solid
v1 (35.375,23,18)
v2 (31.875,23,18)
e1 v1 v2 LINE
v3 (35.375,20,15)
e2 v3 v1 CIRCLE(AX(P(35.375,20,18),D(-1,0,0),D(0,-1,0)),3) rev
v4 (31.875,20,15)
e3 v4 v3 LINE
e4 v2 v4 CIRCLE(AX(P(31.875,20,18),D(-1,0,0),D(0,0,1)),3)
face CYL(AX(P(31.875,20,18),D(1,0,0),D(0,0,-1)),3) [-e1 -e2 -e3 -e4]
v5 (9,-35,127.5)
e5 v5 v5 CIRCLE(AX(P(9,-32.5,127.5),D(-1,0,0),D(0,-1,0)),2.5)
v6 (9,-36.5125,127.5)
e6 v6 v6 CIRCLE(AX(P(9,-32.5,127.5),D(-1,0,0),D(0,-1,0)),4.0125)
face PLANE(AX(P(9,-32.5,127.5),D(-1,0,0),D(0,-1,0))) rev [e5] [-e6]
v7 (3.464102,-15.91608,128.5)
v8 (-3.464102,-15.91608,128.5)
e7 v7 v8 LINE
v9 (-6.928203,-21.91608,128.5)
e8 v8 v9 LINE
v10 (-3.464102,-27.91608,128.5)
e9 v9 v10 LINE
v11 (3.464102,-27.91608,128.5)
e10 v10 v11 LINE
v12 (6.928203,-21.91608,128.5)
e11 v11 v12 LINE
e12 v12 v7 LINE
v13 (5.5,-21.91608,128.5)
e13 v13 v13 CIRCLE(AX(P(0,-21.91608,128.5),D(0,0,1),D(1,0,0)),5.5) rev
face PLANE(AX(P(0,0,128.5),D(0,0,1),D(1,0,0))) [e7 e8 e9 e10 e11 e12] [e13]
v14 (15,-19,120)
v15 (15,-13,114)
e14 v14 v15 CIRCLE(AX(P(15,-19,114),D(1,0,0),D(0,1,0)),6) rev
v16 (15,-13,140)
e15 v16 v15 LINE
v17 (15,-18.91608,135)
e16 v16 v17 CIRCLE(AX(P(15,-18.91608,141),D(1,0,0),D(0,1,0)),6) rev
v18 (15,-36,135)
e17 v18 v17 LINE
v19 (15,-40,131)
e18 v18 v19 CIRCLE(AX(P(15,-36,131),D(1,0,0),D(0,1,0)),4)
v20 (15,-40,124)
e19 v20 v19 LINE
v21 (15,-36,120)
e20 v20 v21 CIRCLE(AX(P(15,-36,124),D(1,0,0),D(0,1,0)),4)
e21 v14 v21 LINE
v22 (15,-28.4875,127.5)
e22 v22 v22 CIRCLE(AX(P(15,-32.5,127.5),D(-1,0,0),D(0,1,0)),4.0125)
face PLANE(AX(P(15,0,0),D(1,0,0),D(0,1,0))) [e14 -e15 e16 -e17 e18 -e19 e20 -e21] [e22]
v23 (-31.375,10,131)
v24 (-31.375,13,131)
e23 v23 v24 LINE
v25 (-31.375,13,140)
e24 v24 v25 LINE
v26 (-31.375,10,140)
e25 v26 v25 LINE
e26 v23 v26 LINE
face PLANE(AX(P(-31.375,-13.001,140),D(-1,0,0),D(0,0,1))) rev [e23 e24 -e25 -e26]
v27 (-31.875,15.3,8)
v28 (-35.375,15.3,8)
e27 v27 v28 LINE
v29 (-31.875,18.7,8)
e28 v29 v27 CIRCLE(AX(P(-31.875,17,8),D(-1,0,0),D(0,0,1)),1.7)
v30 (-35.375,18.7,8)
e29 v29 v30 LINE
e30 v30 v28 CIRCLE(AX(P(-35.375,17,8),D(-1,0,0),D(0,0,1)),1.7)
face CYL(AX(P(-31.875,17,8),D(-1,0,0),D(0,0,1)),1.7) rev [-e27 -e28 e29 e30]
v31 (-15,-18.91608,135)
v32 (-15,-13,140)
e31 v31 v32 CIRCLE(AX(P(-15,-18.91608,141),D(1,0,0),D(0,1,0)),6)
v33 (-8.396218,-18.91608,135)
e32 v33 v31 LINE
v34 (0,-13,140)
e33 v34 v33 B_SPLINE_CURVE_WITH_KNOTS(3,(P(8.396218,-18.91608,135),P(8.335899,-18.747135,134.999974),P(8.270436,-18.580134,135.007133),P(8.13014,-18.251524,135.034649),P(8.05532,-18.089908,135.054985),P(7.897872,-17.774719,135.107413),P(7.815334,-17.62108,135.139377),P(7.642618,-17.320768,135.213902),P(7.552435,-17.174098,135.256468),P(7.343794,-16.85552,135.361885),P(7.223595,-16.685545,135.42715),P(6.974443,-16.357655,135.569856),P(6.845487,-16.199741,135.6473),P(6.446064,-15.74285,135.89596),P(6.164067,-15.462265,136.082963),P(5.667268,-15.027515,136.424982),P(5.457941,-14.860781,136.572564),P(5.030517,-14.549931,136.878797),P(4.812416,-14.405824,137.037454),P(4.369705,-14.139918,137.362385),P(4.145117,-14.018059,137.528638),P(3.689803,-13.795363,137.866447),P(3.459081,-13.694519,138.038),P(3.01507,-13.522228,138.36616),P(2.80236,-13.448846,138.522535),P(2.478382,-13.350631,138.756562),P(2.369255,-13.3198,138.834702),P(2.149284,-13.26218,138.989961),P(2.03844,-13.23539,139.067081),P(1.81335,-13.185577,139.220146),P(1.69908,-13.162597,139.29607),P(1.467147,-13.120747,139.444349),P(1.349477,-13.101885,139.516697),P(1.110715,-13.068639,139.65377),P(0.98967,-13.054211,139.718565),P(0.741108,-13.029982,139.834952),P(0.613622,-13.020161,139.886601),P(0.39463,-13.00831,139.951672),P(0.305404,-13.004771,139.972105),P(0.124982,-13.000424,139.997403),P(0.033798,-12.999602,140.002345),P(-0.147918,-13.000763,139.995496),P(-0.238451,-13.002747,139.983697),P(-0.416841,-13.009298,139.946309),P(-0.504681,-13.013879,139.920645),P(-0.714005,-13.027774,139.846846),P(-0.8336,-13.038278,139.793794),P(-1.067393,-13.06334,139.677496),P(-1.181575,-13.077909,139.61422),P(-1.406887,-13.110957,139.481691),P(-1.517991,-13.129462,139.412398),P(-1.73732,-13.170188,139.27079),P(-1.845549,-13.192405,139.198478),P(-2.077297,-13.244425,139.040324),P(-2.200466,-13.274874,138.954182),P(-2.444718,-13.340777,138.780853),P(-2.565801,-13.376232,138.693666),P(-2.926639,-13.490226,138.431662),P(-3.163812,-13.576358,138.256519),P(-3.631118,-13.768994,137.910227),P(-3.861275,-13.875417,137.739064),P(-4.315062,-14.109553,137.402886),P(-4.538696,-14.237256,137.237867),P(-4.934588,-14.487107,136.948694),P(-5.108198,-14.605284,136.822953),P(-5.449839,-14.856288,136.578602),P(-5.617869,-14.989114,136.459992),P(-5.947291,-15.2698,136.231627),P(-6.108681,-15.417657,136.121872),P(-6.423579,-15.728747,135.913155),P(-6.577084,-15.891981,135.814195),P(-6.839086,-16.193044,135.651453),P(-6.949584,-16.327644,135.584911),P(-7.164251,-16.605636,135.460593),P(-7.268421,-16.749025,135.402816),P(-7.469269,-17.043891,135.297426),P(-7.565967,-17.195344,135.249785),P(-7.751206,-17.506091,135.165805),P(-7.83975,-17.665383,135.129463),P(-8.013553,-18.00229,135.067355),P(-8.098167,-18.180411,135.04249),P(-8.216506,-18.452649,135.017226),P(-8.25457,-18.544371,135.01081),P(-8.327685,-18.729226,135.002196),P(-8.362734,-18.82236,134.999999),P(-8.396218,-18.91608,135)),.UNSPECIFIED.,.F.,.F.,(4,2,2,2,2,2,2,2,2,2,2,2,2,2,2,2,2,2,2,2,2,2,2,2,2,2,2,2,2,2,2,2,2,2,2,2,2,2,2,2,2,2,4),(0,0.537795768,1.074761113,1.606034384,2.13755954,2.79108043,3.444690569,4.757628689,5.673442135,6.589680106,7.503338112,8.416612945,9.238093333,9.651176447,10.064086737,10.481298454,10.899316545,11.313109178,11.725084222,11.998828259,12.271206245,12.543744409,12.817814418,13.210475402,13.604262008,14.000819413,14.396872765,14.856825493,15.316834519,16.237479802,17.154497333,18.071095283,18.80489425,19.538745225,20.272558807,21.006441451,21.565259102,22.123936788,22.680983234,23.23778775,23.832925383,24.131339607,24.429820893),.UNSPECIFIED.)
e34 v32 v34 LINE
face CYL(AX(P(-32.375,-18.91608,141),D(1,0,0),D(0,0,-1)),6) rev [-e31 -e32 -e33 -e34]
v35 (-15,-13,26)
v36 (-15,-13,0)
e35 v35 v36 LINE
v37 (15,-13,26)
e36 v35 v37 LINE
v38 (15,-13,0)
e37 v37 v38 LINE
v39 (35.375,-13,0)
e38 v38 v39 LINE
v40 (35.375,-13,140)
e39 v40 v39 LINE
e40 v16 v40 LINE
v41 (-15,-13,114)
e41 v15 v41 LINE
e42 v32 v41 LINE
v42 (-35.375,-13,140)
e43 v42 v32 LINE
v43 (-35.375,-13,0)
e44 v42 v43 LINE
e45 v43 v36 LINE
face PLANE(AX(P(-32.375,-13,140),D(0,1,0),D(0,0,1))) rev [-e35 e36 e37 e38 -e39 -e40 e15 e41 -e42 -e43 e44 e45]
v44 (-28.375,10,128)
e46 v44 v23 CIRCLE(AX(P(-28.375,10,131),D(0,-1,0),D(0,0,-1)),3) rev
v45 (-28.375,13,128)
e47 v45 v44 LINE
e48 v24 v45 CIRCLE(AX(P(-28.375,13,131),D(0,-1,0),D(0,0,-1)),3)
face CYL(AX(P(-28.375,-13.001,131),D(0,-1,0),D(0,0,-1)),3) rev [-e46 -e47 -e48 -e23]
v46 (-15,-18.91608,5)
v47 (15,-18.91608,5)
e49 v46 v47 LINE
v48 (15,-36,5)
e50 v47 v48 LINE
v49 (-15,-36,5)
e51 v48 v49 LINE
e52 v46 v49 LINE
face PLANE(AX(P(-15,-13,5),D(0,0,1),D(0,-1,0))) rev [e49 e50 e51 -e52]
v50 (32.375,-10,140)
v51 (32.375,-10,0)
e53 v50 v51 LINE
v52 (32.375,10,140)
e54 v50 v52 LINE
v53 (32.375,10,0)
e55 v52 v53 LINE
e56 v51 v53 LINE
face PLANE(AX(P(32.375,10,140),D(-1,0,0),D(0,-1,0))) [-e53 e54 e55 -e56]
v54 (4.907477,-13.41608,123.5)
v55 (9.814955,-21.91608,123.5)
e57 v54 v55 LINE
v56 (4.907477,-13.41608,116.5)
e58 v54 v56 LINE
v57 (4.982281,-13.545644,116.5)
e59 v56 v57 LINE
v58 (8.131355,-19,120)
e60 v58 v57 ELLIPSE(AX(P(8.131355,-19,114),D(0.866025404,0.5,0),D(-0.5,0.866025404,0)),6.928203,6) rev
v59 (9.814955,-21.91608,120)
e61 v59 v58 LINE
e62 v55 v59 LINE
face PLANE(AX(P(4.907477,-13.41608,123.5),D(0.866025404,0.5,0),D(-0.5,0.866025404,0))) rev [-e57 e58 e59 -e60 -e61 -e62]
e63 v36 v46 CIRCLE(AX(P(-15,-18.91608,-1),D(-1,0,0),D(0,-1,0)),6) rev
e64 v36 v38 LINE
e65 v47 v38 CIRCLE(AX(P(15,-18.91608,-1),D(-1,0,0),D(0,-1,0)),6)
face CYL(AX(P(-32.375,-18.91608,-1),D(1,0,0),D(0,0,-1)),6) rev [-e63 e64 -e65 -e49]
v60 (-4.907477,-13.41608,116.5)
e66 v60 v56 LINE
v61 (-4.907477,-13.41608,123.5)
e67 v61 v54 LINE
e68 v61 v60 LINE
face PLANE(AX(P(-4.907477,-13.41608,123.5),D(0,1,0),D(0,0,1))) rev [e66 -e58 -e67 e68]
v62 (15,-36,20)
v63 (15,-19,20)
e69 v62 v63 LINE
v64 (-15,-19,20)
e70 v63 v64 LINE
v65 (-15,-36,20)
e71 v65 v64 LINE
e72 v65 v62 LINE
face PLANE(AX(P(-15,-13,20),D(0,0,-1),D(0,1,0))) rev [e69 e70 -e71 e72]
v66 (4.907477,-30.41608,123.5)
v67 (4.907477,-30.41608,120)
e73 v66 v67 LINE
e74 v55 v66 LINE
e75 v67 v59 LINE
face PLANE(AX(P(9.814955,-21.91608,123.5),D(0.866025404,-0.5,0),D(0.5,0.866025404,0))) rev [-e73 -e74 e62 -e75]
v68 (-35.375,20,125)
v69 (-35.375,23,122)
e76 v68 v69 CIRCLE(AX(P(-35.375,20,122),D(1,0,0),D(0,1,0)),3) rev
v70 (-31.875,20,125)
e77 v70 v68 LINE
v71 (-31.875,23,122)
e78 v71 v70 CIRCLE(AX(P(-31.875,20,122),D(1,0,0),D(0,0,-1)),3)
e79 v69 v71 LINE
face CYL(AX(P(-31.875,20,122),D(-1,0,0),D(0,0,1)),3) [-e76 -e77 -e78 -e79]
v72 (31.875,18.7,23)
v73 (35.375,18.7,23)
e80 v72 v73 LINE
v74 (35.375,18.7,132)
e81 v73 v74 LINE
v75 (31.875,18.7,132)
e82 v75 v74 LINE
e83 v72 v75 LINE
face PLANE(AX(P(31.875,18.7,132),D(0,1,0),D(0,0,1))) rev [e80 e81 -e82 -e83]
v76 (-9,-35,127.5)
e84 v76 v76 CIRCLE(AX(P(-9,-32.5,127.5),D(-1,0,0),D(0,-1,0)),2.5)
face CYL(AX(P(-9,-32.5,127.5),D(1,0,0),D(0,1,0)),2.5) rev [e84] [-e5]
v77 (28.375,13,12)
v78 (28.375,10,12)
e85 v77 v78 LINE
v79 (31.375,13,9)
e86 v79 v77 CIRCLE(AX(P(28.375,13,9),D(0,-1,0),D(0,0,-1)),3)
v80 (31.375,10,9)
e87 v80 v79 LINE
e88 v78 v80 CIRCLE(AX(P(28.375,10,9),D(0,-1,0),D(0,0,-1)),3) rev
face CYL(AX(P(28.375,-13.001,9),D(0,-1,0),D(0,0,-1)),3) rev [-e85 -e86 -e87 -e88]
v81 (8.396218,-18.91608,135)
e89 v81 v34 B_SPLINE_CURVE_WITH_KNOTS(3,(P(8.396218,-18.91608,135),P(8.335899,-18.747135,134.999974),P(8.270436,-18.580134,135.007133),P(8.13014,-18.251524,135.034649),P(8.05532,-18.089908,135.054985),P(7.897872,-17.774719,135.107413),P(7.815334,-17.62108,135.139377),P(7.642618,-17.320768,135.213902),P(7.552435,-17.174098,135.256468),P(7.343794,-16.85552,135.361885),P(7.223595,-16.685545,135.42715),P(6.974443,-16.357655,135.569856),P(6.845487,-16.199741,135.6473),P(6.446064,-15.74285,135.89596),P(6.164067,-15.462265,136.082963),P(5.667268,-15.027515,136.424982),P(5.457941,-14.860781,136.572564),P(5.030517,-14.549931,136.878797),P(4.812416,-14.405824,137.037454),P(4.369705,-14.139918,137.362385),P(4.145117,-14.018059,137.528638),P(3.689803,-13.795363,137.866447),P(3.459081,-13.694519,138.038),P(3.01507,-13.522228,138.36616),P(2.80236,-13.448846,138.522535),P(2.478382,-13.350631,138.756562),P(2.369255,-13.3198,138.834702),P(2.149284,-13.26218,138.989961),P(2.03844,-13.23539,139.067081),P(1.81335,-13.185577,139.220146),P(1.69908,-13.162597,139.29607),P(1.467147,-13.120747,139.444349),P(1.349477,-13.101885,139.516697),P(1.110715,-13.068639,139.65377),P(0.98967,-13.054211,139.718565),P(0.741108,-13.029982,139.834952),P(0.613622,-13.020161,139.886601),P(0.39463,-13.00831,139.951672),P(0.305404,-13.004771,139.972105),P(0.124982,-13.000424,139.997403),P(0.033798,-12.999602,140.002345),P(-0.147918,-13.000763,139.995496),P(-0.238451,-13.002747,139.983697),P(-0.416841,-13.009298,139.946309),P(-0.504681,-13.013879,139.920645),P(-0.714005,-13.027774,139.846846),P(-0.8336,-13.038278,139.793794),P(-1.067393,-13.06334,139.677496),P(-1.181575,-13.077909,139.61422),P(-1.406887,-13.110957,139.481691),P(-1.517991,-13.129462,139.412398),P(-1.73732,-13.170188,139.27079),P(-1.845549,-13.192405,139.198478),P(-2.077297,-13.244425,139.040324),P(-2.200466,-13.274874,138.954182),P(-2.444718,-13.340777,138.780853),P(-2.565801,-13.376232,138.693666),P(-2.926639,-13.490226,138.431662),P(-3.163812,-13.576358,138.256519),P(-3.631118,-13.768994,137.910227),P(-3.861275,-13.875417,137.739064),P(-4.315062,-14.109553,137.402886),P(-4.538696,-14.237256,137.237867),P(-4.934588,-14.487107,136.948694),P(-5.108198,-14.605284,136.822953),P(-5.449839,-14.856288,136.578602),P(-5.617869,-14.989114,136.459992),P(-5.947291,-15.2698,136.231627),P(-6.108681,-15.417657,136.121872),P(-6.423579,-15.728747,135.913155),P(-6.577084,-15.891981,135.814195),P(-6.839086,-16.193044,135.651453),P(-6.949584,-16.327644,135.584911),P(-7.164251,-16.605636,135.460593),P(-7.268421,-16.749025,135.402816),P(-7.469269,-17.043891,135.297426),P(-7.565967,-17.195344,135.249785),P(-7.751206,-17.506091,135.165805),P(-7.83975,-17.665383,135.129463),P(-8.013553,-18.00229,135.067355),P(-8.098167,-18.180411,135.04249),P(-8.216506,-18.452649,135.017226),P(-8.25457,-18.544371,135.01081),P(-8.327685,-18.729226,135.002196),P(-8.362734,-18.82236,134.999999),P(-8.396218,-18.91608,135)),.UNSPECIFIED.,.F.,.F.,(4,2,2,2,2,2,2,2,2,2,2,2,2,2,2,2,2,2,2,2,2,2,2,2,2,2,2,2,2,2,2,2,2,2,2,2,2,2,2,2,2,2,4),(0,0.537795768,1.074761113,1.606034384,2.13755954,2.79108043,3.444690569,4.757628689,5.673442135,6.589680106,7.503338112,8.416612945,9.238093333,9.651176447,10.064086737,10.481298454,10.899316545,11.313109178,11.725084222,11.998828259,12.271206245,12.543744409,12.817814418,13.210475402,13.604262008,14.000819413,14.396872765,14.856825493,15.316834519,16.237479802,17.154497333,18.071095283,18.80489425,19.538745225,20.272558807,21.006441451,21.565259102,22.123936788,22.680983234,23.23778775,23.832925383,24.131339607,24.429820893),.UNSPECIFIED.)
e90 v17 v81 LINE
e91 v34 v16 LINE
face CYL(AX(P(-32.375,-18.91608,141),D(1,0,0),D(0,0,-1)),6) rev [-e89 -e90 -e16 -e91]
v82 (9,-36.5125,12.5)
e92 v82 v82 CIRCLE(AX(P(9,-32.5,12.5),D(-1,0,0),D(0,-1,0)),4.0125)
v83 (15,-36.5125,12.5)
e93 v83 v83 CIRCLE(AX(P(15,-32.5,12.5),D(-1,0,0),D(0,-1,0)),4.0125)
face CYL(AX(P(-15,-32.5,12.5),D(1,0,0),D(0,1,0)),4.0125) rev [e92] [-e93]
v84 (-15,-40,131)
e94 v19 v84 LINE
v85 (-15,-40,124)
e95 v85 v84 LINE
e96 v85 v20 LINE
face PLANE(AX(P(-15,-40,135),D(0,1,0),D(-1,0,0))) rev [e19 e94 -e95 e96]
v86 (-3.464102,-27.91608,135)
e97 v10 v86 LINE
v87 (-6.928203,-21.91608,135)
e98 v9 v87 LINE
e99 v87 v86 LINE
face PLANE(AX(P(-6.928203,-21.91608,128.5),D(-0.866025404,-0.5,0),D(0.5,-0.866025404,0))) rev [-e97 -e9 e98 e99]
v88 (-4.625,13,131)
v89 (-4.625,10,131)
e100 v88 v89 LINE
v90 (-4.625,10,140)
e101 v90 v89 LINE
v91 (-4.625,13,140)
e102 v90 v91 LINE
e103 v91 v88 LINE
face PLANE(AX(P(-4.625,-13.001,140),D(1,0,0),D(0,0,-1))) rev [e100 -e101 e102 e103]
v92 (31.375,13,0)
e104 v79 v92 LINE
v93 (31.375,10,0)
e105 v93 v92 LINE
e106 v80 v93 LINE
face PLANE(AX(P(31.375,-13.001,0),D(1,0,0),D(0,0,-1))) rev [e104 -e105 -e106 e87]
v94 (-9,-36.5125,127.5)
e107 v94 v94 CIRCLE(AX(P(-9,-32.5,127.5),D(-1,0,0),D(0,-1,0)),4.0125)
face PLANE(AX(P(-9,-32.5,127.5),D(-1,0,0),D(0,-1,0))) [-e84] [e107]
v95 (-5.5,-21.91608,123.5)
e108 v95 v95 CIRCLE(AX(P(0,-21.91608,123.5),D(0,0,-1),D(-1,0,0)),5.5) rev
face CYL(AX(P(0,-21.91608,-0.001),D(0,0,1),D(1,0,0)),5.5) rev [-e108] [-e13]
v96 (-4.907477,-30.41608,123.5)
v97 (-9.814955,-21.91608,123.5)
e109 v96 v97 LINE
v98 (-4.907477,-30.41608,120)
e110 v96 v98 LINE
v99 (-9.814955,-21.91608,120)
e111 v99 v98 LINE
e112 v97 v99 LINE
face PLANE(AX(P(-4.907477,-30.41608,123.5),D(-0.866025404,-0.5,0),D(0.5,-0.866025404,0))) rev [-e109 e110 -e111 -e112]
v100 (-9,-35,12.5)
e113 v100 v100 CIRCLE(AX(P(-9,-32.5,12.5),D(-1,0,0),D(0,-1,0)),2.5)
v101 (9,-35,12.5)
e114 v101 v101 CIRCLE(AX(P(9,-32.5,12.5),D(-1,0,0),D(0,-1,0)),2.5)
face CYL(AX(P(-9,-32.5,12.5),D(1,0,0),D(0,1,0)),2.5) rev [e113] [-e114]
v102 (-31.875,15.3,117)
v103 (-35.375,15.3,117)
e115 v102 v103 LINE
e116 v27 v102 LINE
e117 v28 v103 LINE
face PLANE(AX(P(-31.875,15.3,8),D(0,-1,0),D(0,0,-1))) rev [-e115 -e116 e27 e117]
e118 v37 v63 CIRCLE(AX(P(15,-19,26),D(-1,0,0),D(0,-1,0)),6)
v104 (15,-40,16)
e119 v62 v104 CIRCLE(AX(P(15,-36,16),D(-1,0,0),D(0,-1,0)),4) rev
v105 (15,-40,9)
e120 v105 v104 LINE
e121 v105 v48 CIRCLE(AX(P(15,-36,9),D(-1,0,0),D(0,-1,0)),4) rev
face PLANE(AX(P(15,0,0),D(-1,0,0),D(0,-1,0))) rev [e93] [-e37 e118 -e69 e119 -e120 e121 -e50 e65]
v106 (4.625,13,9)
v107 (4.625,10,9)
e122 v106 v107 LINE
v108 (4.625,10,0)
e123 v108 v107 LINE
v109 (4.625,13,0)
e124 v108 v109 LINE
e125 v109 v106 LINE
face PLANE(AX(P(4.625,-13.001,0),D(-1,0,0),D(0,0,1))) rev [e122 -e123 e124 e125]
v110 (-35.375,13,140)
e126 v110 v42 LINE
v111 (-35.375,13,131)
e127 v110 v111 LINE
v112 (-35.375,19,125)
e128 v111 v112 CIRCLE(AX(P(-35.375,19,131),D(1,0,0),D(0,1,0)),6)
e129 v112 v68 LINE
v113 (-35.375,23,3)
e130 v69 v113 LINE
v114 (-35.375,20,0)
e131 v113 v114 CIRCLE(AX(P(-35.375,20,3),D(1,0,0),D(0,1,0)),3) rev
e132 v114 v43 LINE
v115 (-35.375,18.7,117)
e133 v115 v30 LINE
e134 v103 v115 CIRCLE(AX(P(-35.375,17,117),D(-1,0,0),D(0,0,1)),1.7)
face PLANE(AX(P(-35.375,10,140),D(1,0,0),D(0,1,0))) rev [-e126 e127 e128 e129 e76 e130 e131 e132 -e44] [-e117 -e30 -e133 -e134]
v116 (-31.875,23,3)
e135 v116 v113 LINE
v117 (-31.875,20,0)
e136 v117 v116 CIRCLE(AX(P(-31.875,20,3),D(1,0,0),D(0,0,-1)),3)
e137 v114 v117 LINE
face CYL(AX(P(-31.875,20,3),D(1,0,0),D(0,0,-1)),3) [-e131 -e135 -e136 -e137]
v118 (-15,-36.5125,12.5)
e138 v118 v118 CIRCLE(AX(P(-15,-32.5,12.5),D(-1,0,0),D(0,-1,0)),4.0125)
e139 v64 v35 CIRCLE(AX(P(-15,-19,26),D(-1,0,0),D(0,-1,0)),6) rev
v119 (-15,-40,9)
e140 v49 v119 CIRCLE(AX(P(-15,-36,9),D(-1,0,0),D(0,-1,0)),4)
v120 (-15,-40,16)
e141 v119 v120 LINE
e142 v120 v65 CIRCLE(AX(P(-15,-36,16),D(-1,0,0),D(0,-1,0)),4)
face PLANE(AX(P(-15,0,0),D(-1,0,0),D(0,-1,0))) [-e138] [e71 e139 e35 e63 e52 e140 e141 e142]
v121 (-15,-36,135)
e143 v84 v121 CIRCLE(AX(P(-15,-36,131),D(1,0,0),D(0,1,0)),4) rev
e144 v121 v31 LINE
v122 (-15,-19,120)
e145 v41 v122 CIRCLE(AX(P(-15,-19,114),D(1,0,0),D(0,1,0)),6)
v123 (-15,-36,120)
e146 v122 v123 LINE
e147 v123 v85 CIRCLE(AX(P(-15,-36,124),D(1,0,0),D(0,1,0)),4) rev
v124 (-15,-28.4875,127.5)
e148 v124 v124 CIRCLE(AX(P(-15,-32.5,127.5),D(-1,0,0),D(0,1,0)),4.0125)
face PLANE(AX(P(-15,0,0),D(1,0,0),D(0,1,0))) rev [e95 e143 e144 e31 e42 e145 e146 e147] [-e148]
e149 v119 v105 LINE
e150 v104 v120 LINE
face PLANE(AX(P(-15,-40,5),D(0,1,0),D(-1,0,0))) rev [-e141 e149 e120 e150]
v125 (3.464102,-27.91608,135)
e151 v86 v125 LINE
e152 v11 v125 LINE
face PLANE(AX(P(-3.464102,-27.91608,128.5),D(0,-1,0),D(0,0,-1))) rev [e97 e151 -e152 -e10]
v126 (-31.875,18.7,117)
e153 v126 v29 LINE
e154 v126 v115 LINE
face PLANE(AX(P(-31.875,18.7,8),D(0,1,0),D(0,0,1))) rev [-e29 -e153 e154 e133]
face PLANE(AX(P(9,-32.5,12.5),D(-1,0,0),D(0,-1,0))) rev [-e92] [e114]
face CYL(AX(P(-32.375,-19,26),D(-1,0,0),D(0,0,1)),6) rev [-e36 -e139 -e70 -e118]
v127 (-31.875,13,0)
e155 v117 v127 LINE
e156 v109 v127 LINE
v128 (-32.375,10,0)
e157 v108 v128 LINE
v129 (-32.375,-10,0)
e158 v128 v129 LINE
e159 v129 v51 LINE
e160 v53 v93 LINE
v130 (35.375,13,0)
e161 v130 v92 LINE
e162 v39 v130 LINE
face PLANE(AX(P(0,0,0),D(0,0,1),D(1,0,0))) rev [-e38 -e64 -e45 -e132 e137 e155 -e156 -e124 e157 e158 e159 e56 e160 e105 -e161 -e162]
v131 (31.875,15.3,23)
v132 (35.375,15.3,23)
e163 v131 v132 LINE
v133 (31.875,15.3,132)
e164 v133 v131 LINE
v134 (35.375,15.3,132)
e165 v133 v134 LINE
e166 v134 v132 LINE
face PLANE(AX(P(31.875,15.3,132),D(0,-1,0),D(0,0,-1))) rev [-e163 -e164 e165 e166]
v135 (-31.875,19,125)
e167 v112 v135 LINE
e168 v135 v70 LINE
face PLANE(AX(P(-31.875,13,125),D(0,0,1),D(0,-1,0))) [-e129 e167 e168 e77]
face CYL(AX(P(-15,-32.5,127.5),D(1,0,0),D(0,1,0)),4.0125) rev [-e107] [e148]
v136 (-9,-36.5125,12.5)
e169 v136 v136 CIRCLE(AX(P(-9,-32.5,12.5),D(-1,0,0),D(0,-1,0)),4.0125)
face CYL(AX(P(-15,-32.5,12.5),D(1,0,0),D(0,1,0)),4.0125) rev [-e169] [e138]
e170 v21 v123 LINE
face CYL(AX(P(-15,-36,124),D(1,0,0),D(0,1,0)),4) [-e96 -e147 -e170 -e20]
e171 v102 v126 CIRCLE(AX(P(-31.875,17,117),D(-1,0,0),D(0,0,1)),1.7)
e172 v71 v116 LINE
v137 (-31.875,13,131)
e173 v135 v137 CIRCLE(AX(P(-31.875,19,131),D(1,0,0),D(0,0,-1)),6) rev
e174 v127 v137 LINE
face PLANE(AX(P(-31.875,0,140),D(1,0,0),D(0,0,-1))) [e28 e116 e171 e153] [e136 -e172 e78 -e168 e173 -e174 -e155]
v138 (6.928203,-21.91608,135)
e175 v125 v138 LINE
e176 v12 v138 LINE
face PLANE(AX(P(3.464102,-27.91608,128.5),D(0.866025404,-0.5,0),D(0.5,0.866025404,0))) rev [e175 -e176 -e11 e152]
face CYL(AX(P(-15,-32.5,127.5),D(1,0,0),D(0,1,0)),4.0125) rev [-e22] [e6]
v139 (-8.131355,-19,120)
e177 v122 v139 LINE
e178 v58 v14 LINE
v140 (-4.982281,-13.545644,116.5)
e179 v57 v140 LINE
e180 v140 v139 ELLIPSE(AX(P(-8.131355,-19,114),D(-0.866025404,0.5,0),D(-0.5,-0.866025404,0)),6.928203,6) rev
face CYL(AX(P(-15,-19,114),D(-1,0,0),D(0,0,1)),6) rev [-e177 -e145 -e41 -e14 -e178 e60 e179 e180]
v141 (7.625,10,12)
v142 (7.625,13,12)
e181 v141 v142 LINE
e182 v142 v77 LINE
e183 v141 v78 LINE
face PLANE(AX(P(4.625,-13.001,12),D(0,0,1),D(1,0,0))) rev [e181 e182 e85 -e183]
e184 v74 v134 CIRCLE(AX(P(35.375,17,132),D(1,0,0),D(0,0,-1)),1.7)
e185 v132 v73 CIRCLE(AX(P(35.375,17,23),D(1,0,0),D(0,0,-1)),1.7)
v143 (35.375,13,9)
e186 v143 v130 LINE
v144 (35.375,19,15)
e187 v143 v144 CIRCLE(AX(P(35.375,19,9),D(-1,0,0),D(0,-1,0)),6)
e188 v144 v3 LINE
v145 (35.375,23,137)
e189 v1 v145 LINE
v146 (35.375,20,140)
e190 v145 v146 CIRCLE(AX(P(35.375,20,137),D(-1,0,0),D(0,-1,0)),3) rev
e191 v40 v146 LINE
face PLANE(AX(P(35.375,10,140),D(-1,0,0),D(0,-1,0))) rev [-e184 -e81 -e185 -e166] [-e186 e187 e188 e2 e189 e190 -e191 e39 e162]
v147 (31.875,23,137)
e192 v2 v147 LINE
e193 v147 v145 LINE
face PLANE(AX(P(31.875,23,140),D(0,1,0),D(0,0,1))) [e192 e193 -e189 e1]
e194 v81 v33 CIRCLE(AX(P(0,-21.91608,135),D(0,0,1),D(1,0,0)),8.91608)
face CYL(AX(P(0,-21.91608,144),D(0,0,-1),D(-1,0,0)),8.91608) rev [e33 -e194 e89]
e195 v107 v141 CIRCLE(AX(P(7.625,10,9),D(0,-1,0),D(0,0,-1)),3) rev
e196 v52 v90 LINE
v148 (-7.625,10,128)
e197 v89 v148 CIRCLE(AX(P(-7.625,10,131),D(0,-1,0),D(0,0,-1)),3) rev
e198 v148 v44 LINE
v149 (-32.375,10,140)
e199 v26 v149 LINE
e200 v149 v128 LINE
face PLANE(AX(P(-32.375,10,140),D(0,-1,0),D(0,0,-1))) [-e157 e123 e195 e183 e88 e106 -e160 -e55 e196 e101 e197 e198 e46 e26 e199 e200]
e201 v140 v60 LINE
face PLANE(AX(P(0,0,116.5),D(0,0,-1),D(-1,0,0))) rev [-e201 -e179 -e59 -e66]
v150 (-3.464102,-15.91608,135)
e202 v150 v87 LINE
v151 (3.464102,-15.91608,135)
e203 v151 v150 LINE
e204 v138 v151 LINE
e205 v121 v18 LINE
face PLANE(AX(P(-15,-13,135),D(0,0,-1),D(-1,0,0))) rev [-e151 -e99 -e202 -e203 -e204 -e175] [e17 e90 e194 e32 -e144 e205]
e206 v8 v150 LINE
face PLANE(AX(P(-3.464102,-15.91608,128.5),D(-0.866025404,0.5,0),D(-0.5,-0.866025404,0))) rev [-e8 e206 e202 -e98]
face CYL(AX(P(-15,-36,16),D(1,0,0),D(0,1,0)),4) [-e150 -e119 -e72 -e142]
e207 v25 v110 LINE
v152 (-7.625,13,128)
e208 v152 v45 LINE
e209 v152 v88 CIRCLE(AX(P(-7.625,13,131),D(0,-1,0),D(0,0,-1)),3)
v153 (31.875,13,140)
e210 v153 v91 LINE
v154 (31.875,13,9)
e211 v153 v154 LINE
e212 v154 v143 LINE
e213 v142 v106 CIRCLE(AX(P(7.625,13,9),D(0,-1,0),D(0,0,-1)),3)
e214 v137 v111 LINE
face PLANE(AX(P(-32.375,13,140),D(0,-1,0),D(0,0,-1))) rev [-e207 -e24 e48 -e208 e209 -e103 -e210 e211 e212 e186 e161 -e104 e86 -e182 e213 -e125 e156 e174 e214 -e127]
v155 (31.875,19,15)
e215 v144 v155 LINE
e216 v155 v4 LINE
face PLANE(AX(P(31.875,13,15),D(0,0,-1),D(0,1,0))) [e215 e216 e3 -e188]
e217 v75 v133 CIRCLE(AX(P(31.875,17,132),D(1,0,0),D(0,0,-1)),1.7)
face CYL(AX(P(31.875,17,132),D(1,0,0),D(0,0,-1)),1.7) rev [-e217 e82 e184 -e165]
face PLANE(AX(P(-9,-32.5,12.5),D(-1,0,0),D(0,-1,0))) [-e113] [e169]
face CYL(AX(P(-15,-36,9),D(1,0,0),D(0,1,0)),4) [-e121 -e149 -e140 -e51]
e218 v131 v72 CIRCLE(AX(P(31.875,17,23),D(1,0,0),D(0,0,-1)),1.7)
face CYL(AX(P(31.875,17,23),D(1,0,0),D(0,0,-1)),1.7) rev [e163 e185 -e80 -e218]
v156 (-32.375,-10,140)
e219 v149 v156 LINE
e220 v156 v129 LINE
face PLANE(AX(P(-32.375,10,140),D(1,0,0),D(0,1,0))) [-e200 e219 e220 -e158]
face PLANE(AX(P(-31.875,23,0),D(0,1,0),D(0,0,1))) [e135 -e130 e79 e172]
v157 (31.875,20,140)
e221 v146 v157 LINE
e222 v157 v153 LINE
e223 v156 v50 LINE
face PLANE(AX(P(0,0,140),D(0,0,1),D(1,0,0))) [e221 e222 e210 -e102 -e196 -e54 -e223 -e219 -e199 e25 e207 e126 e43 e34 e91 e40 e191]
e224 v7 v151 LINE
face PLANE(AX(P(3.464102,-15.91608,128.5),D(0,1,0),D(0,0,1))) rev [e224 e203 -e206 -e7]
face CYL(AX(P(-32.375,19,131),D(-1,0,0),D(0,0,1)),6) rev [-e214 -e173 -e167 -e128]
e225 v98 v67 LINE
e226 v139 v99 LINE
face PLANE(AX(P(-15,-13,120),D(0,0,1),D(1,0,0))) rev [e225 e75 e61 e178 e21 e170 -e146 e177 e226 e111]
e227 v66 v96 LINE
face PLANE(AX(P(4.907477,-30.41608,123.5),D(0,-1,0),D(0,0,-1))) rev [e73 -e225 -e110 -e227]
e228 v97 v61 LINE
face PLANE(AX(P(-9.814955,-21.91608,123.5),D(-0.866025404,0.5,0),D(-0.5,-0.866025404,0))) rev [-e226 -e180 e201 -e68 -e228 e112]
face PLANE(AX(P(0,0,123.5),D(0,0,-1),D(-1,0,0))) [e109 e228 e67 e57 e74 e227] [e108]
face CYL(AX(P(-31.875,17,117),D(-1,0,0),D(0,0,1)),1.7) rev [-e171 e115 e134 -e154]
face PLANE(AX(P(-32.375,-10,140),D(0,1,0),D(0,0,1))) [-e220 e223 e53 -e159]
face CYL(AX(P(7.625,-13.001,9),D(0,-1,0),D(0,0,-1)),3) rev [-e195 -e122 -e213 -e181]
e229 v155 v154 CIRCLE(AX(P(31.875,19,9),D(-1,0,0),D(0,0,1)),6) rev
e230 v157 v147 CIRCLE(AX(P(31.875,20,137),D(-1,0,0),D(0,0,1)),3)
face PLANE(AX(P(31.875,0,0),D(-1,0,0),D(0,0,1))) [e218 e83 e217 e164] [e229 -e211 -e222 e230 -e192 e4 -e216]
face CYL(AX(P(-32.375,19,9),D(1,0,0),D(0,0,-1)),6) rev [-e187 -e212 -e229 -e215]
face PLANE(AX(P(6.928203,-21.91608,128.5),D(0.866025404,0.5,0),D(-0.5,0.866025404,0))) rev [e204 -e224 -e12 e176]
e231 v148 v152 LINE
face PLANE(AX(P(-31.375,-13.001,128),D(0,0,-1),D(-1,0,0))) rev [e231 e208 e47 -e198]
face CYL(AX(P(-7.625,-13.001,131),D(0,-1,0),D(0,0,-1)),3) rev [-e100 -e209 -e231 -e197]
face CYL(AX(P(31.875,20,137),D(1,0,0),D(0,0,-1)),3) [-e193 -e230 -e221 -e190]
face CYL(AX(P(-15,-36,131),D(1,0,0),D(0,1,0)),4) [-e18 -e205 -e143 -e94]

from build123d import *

# Parameters (mm, degrees)
SKETCH1_W            = 64.75
SKETCH1_H            = 20
BODY_DEPTH           = 140
SHELL1_T             = 3
SWITCH_CUTOUT_REACH  = 148.722
SKETCH2_W            = 26.75
SKETCH2_H            = 12
SKETCH4_W            = 15
SKETCH4_H            = 27
SKETCH4_R            = 4.0125
AXLE_HOLDER_DEPTH    = 15
SKETCH5_R            = 4.0125
SKETCH5_R_2          = 2.5
BUSHING_HOLDER_DEPTH = 9
FILLET3_R            = 4
FILLET4_R            = 6
SKETCH6_W            = 125
SKETCH6_H            = 10
SLIDE_MOUNT_DEPTH    = 3.5
CIRPATTERN1_COUNT    = 2
FILLET6_R            = 3
FILLET7_R            = 3
FILLET8_R            = 6
CUT_EXTRUDE1_REACH   = 147.177
SKETCH7_R            = 5.5
SKETCH8_R            = 8.916079783
CUT_EXTRUDE2_DEPTH   = 9
CUT_EXTRUDE3_DEPTH   = 3.5
CUT_EXTRUDE4_DEPTH   = 6.5


with BuildPart() as part:
    # Sketch1 → Body (new body)
    with BuildSketch(Plane.XY):
        Rectangle(SKETCH1_W, SKETCH1_H)
    extrude(amount=BODY_DEPTH)

    # Shell1
    shell1_openings = [part.faces().sort_by_distance(p)[0] for p in [
        (0, 0, 0),
        (0, 0, 140),
    ]]
    offset(amount=SHELL1_T, openings=shell1_openings, kind=Kind.INTERSECTION)

    # Sketch2 → Switch_cutout (cut, up to next)
    with BuildSketch(Plane(origin=(0, 13, 0), x_dir=(1, 0, 0), z_dir=(0, 1, 0)), mode=Mode.PRIVATE) as switch_cutout_sk1:
        with Locations((18, -6)):
            Rectangle(SKETCH2_W, SKETCH2_H)
    switch_cutout_tool1 = extrude(switch_cutout_sk1.sketch, amount=-SWITCH_CUTOUT_REACH, mode=Mode.PRIVATE) & part.part
    # Sketch2 → Switch_cutout (cut, up to next)
    with BuildSketch(Plane(origin=(0, 13, 0), x_dir=(1, 0, 0), z_dir=(0, 1, 0)), mode=Mode.PRIVATE) as switch_cutout_sk2:
        with Locations((-18, -134)):
            Rectangle(SKETCH2_W, SKETCH2_H)
    switch_cutout_tool2 = extrude(switch_cutout_sk2.sketch, amount=-SWITCH_CUTOUT_REACH, mode=Mode.PRIVATE) & part.part
    add(switch_cutout_tool1.solids().sort_by_distance((18, 13, 6))[0], mode=Mode.SUBTRACT)
    add(switch_cutout_tool2.solids().sort_by_distance((-18, 13, 134))[0], mode=Mode.SUBTRACT)

    # Sketch4 → Axle_holder (add, symmetric)
    # profile 1 of 2: a face of its own
    with BuildSketch(Plane.ZY):
        with Locations((12.5, -26.5)):
            Rectangle(SKETCH4_W, SKETCH4_H)
        with Locations(Location((12.5, -32.5, 0), (0, 0, 270))):
            Circle(SKETCH4_R, mode=Mode.SUBTRACT)
    # profile 2 of 2: a face of its own
    with BuildSketch(Plane.ZY):
        with Locations((127.5, -26.5)):
            Rectangle(SKETCH4_W, SKETCH4_H)
        with Locations(Location((127.5, -32.5, 0), (0, 0, 90))):
            Circle(SKETCH4_R, mode=Mode.SUBTRACT)
    extrude(amount=AXLE_HOLDER_DEPTH, both=True)

    # Sketch5 → Bushing_holder (add, symmetric)
    # profile 1 of 2: a face of its own
    with BuildSketch(Plane.ZY):
        with Locations(Location((12.5, -32.5, 0), (0, 0, 270))):
            Circle(SKETCH5_R)
        with Locations(Location((12.5, -32.5, 0), (0, 0, 270))):
            Circle(SKETCH5_R_2, mode=Mode.SUBTRACT)
    # profile 2 of 2: a face of its own
    with BuildSketch(Plane.ZY):
        with Locations(Location((127.5, -32.5, 0), (0, 0, 90))):
            Circle(SKETCH5_R)
        with Locations(Location((127.5, -32.5, 0), (0, 0, 270))):
            Circle(SKETCH5_R_2, mode=Mode.SUBTRACT)
    extrude(amount=BUSHING_HOLDER_DEPTH, both=True)

    # Fillet3
    fillet3_edges = [part.edges().sort_by_distance(p)[0] for p in [
        (0, -40, 5),
        (0, -40, 20),
        (0, -40, 135),
        (0, -40, 120),
    ]]
    fillet(fillet3_edges, radius=FILLET3_R)

    # Fillet4
    # the kernel refuses this fillet: 6 mm, written as the material it adds along each edge
    with BuildSketch(Plane(origin=(15, -13, 5), x_dir=(0, 0, -1), z_dir=(-1, 0, 0))) as fillet4_piece_1:
        with BuildLine():
            CenterArc((6, 5.916079783), FILLET4_R, 180, 80.405931773)
            Line((0, 5.916079783), (-0.12, 5.916079783))
            Line((-0.12, 5.916079783), (-0.12, 0))
            Line((-0.12, 0), (0, -0.12))
            ThreePointArc((0, -0.12), (2.5, -0.12), (4.98, -0.118321596))
            Line((4.98, -0.118321596), (5, 0))
        make_face()
    extrude(amount=30)
    with BuildSketch(Plane(origin=(-15, -13, 20), x_dir=(0, 0, 1), z_dir=(1, 0, 0)), Plane(origin=(-15, -13, 120), x_dir=(0, -1, 0), z_dir=(1, 0, 0))) as fillet4_piece_2:
        with BuildLine():
            CenterArc((FILLET4_R, FILLET4_R), FILLET4_R, 180, 90)
            Line((0, FILLET4_R), (-FILLET4_R * 0.02, FILLET4_R))
            Line((-FILLET4_R * 0.02, FILLET4_R), (-FILLET4_R * 0.02, -FILLET4_R * 0.02))
            Line((-FILLET4_R * 0.02, -FILLET4_R * 0.02), (FILLET4_R, -FILLET4_R * 0.02))
            Line((FILLET4_R, -FILLET4_R * 0.02), (FILLET4_R, 0))
        make_face()
    extrude(amount=30)
    with BuildSketch(Plane(origin=(15, -13, 135), x_dir=(0, 0, 1), z_dir=(-1, 0, 0))) as fillet4_piece_3:
        with BuildLine():
            CenterArc((6, -5.916079783), FILLET4_R, 99.594068227, 80.405931773)
            Line((0, -5.916079783), (-0.12, -5.916079783))
            Line((-0.12, -5.916079783), (-0.12, 0))
            Line((-0.12, 0), (0, 0.12))
            ThreePointArc((0, 0.12), (2.5, 0.12), (4.98, 0.118321596))
            Line((4.98, 0.118321596), (5, 0))
        make_face()
    extrude(amount=30)

    # Sketch6 → Slide_mount (add)
    with BuildSketch(Plane(origin=(35.375, 0, 0), x_dir=(0, 0, -1), z_dir=(1, 0, 0))):
        with Locations((-77.5, 18)):
            Rectangle(SKETCH6_W, SKETCH6_H)
        with BuildLine():
            Line((-132, 18.7), (-23, 18.7))
            ThreePointArc((-23, 18.7), (-21.3, 17), (-23, 15.3))
            Line((-23, 15.3), (-132, 15.3))
            ThreePointArc((-132, 15.3), (-133.7, 17), (-132, 18.7))
        make_face(mode=Mode.SUBTRACT)
    slide_mount = extrude(amount=-SLIDE_MOUNT_DEPTH)

    # CirPattern1: Slide_mount ×2 about axis
    cirpattern1_axis = Axis((0, 0, 70), (0, 1, 0))
    for i in range(1, CIRPATTERN1_COUNT):
        add(slide_mount.rotate(cirpattern1_axis, i * 360 / CIRPATTERN1_COUNT))

    # Fillet6
    fillet6_edges = [part.edges().sort_by_distance(p)[0] for p in [
        (33.625, 23, 140),
        (33.625, 23, 15),
        (-33.625, 23, 0),
        (-33.625, 23, 125),
    ]]
    fillet(fillet6_edges, radius=FILLET6_R)

    # Fillet7
    fillet7_edges = [part.edges().sort_by_distance(p)[0] for p in [
        (4.625, 11.5, 12),
        (31.375, 11.5, 12),
        (-31.375, 11.5, 128),
        (-4.625, 11.5, 128),
    ]]
    fillet(fillet7_edges, radius=FILLET7_R)

    # Fillet8
    fillet8_edges = [part.edges().sort_by_distance(p)[0] for p in [
        (33.625, 13, 15),
        (-33.625, 13, 125),
    ]]
    fillet(fillet8_edges, radius=FILLET8_R)

    # Sketch7 → Cut-Extrude1 (cut, up to next)
    with BuildSketch(Plane.XY.offset(135), mode=Mode.PRIVATE) as cut_extrude1_sk1:
        with Locations(Location((0, -21.916079783, 0), (0, 0, 32.018720622))):
            Circle(SKETCH7_R)
    cut_extrude1_tool1 = extrude(cut_extrude1_sk1.sketch, amount=-CUT_EXTRUDE1_REACH, mode=Mode.PRIVATE) & part.part
    add(cut_extrude1_tool1.solids().sort_by_distance((0, -21.91608, 135))[0], mode=Mode.SUBTRACT)

    # Sketch8 → Cut-Extrude2 (cut)
    with BuildSketch(Plane.XY.offset(135)):
        with Locations((0, -21.916079783)):
            Circle(SKETCH8_R)
    extrude(amount=CUT_EXTRUDE2_DEPTH, mode=Mode.SUBTRACT)

    # Sketch9 → Cut-Extrude3 (cut, symmetric)
    with BuildSketch(Plane(origin=(0, 0, 120), x_dir=(-1, 0, 0), z_dir=(0, 0, -1))):
        Polygon((-9.814954576, -21.916079783), (-4.907477288, -30.416079783), (4.907477288, -30.416079783), (9.814954576, -21.916079783), (4.907477288, -13.416079783), (-4.907477288, -13.416079783), align=None)
    extrude(amount=CUT_EXTRUDE3_DEPTH, both=True, mode=Mode.SUBTRACT)

    # Sketch10 → Cut-Extrude4 (cut)
    with BuildSketch(Plane.XY.offset(135)):
        Polygon((3.464101615, -15.916079783), (-3.464101615, -15.916079783), (-6.92820323, -21.916079783), (-3.464101615, -27.916079783), (3.464101615, -27.916079783), (6.92820323, -21.916079783), align=None)
    extrude(amount=-CUT_EXTRUDE4_DEPTH, mode=Mode.SUBTRACT)


solid = part.part
